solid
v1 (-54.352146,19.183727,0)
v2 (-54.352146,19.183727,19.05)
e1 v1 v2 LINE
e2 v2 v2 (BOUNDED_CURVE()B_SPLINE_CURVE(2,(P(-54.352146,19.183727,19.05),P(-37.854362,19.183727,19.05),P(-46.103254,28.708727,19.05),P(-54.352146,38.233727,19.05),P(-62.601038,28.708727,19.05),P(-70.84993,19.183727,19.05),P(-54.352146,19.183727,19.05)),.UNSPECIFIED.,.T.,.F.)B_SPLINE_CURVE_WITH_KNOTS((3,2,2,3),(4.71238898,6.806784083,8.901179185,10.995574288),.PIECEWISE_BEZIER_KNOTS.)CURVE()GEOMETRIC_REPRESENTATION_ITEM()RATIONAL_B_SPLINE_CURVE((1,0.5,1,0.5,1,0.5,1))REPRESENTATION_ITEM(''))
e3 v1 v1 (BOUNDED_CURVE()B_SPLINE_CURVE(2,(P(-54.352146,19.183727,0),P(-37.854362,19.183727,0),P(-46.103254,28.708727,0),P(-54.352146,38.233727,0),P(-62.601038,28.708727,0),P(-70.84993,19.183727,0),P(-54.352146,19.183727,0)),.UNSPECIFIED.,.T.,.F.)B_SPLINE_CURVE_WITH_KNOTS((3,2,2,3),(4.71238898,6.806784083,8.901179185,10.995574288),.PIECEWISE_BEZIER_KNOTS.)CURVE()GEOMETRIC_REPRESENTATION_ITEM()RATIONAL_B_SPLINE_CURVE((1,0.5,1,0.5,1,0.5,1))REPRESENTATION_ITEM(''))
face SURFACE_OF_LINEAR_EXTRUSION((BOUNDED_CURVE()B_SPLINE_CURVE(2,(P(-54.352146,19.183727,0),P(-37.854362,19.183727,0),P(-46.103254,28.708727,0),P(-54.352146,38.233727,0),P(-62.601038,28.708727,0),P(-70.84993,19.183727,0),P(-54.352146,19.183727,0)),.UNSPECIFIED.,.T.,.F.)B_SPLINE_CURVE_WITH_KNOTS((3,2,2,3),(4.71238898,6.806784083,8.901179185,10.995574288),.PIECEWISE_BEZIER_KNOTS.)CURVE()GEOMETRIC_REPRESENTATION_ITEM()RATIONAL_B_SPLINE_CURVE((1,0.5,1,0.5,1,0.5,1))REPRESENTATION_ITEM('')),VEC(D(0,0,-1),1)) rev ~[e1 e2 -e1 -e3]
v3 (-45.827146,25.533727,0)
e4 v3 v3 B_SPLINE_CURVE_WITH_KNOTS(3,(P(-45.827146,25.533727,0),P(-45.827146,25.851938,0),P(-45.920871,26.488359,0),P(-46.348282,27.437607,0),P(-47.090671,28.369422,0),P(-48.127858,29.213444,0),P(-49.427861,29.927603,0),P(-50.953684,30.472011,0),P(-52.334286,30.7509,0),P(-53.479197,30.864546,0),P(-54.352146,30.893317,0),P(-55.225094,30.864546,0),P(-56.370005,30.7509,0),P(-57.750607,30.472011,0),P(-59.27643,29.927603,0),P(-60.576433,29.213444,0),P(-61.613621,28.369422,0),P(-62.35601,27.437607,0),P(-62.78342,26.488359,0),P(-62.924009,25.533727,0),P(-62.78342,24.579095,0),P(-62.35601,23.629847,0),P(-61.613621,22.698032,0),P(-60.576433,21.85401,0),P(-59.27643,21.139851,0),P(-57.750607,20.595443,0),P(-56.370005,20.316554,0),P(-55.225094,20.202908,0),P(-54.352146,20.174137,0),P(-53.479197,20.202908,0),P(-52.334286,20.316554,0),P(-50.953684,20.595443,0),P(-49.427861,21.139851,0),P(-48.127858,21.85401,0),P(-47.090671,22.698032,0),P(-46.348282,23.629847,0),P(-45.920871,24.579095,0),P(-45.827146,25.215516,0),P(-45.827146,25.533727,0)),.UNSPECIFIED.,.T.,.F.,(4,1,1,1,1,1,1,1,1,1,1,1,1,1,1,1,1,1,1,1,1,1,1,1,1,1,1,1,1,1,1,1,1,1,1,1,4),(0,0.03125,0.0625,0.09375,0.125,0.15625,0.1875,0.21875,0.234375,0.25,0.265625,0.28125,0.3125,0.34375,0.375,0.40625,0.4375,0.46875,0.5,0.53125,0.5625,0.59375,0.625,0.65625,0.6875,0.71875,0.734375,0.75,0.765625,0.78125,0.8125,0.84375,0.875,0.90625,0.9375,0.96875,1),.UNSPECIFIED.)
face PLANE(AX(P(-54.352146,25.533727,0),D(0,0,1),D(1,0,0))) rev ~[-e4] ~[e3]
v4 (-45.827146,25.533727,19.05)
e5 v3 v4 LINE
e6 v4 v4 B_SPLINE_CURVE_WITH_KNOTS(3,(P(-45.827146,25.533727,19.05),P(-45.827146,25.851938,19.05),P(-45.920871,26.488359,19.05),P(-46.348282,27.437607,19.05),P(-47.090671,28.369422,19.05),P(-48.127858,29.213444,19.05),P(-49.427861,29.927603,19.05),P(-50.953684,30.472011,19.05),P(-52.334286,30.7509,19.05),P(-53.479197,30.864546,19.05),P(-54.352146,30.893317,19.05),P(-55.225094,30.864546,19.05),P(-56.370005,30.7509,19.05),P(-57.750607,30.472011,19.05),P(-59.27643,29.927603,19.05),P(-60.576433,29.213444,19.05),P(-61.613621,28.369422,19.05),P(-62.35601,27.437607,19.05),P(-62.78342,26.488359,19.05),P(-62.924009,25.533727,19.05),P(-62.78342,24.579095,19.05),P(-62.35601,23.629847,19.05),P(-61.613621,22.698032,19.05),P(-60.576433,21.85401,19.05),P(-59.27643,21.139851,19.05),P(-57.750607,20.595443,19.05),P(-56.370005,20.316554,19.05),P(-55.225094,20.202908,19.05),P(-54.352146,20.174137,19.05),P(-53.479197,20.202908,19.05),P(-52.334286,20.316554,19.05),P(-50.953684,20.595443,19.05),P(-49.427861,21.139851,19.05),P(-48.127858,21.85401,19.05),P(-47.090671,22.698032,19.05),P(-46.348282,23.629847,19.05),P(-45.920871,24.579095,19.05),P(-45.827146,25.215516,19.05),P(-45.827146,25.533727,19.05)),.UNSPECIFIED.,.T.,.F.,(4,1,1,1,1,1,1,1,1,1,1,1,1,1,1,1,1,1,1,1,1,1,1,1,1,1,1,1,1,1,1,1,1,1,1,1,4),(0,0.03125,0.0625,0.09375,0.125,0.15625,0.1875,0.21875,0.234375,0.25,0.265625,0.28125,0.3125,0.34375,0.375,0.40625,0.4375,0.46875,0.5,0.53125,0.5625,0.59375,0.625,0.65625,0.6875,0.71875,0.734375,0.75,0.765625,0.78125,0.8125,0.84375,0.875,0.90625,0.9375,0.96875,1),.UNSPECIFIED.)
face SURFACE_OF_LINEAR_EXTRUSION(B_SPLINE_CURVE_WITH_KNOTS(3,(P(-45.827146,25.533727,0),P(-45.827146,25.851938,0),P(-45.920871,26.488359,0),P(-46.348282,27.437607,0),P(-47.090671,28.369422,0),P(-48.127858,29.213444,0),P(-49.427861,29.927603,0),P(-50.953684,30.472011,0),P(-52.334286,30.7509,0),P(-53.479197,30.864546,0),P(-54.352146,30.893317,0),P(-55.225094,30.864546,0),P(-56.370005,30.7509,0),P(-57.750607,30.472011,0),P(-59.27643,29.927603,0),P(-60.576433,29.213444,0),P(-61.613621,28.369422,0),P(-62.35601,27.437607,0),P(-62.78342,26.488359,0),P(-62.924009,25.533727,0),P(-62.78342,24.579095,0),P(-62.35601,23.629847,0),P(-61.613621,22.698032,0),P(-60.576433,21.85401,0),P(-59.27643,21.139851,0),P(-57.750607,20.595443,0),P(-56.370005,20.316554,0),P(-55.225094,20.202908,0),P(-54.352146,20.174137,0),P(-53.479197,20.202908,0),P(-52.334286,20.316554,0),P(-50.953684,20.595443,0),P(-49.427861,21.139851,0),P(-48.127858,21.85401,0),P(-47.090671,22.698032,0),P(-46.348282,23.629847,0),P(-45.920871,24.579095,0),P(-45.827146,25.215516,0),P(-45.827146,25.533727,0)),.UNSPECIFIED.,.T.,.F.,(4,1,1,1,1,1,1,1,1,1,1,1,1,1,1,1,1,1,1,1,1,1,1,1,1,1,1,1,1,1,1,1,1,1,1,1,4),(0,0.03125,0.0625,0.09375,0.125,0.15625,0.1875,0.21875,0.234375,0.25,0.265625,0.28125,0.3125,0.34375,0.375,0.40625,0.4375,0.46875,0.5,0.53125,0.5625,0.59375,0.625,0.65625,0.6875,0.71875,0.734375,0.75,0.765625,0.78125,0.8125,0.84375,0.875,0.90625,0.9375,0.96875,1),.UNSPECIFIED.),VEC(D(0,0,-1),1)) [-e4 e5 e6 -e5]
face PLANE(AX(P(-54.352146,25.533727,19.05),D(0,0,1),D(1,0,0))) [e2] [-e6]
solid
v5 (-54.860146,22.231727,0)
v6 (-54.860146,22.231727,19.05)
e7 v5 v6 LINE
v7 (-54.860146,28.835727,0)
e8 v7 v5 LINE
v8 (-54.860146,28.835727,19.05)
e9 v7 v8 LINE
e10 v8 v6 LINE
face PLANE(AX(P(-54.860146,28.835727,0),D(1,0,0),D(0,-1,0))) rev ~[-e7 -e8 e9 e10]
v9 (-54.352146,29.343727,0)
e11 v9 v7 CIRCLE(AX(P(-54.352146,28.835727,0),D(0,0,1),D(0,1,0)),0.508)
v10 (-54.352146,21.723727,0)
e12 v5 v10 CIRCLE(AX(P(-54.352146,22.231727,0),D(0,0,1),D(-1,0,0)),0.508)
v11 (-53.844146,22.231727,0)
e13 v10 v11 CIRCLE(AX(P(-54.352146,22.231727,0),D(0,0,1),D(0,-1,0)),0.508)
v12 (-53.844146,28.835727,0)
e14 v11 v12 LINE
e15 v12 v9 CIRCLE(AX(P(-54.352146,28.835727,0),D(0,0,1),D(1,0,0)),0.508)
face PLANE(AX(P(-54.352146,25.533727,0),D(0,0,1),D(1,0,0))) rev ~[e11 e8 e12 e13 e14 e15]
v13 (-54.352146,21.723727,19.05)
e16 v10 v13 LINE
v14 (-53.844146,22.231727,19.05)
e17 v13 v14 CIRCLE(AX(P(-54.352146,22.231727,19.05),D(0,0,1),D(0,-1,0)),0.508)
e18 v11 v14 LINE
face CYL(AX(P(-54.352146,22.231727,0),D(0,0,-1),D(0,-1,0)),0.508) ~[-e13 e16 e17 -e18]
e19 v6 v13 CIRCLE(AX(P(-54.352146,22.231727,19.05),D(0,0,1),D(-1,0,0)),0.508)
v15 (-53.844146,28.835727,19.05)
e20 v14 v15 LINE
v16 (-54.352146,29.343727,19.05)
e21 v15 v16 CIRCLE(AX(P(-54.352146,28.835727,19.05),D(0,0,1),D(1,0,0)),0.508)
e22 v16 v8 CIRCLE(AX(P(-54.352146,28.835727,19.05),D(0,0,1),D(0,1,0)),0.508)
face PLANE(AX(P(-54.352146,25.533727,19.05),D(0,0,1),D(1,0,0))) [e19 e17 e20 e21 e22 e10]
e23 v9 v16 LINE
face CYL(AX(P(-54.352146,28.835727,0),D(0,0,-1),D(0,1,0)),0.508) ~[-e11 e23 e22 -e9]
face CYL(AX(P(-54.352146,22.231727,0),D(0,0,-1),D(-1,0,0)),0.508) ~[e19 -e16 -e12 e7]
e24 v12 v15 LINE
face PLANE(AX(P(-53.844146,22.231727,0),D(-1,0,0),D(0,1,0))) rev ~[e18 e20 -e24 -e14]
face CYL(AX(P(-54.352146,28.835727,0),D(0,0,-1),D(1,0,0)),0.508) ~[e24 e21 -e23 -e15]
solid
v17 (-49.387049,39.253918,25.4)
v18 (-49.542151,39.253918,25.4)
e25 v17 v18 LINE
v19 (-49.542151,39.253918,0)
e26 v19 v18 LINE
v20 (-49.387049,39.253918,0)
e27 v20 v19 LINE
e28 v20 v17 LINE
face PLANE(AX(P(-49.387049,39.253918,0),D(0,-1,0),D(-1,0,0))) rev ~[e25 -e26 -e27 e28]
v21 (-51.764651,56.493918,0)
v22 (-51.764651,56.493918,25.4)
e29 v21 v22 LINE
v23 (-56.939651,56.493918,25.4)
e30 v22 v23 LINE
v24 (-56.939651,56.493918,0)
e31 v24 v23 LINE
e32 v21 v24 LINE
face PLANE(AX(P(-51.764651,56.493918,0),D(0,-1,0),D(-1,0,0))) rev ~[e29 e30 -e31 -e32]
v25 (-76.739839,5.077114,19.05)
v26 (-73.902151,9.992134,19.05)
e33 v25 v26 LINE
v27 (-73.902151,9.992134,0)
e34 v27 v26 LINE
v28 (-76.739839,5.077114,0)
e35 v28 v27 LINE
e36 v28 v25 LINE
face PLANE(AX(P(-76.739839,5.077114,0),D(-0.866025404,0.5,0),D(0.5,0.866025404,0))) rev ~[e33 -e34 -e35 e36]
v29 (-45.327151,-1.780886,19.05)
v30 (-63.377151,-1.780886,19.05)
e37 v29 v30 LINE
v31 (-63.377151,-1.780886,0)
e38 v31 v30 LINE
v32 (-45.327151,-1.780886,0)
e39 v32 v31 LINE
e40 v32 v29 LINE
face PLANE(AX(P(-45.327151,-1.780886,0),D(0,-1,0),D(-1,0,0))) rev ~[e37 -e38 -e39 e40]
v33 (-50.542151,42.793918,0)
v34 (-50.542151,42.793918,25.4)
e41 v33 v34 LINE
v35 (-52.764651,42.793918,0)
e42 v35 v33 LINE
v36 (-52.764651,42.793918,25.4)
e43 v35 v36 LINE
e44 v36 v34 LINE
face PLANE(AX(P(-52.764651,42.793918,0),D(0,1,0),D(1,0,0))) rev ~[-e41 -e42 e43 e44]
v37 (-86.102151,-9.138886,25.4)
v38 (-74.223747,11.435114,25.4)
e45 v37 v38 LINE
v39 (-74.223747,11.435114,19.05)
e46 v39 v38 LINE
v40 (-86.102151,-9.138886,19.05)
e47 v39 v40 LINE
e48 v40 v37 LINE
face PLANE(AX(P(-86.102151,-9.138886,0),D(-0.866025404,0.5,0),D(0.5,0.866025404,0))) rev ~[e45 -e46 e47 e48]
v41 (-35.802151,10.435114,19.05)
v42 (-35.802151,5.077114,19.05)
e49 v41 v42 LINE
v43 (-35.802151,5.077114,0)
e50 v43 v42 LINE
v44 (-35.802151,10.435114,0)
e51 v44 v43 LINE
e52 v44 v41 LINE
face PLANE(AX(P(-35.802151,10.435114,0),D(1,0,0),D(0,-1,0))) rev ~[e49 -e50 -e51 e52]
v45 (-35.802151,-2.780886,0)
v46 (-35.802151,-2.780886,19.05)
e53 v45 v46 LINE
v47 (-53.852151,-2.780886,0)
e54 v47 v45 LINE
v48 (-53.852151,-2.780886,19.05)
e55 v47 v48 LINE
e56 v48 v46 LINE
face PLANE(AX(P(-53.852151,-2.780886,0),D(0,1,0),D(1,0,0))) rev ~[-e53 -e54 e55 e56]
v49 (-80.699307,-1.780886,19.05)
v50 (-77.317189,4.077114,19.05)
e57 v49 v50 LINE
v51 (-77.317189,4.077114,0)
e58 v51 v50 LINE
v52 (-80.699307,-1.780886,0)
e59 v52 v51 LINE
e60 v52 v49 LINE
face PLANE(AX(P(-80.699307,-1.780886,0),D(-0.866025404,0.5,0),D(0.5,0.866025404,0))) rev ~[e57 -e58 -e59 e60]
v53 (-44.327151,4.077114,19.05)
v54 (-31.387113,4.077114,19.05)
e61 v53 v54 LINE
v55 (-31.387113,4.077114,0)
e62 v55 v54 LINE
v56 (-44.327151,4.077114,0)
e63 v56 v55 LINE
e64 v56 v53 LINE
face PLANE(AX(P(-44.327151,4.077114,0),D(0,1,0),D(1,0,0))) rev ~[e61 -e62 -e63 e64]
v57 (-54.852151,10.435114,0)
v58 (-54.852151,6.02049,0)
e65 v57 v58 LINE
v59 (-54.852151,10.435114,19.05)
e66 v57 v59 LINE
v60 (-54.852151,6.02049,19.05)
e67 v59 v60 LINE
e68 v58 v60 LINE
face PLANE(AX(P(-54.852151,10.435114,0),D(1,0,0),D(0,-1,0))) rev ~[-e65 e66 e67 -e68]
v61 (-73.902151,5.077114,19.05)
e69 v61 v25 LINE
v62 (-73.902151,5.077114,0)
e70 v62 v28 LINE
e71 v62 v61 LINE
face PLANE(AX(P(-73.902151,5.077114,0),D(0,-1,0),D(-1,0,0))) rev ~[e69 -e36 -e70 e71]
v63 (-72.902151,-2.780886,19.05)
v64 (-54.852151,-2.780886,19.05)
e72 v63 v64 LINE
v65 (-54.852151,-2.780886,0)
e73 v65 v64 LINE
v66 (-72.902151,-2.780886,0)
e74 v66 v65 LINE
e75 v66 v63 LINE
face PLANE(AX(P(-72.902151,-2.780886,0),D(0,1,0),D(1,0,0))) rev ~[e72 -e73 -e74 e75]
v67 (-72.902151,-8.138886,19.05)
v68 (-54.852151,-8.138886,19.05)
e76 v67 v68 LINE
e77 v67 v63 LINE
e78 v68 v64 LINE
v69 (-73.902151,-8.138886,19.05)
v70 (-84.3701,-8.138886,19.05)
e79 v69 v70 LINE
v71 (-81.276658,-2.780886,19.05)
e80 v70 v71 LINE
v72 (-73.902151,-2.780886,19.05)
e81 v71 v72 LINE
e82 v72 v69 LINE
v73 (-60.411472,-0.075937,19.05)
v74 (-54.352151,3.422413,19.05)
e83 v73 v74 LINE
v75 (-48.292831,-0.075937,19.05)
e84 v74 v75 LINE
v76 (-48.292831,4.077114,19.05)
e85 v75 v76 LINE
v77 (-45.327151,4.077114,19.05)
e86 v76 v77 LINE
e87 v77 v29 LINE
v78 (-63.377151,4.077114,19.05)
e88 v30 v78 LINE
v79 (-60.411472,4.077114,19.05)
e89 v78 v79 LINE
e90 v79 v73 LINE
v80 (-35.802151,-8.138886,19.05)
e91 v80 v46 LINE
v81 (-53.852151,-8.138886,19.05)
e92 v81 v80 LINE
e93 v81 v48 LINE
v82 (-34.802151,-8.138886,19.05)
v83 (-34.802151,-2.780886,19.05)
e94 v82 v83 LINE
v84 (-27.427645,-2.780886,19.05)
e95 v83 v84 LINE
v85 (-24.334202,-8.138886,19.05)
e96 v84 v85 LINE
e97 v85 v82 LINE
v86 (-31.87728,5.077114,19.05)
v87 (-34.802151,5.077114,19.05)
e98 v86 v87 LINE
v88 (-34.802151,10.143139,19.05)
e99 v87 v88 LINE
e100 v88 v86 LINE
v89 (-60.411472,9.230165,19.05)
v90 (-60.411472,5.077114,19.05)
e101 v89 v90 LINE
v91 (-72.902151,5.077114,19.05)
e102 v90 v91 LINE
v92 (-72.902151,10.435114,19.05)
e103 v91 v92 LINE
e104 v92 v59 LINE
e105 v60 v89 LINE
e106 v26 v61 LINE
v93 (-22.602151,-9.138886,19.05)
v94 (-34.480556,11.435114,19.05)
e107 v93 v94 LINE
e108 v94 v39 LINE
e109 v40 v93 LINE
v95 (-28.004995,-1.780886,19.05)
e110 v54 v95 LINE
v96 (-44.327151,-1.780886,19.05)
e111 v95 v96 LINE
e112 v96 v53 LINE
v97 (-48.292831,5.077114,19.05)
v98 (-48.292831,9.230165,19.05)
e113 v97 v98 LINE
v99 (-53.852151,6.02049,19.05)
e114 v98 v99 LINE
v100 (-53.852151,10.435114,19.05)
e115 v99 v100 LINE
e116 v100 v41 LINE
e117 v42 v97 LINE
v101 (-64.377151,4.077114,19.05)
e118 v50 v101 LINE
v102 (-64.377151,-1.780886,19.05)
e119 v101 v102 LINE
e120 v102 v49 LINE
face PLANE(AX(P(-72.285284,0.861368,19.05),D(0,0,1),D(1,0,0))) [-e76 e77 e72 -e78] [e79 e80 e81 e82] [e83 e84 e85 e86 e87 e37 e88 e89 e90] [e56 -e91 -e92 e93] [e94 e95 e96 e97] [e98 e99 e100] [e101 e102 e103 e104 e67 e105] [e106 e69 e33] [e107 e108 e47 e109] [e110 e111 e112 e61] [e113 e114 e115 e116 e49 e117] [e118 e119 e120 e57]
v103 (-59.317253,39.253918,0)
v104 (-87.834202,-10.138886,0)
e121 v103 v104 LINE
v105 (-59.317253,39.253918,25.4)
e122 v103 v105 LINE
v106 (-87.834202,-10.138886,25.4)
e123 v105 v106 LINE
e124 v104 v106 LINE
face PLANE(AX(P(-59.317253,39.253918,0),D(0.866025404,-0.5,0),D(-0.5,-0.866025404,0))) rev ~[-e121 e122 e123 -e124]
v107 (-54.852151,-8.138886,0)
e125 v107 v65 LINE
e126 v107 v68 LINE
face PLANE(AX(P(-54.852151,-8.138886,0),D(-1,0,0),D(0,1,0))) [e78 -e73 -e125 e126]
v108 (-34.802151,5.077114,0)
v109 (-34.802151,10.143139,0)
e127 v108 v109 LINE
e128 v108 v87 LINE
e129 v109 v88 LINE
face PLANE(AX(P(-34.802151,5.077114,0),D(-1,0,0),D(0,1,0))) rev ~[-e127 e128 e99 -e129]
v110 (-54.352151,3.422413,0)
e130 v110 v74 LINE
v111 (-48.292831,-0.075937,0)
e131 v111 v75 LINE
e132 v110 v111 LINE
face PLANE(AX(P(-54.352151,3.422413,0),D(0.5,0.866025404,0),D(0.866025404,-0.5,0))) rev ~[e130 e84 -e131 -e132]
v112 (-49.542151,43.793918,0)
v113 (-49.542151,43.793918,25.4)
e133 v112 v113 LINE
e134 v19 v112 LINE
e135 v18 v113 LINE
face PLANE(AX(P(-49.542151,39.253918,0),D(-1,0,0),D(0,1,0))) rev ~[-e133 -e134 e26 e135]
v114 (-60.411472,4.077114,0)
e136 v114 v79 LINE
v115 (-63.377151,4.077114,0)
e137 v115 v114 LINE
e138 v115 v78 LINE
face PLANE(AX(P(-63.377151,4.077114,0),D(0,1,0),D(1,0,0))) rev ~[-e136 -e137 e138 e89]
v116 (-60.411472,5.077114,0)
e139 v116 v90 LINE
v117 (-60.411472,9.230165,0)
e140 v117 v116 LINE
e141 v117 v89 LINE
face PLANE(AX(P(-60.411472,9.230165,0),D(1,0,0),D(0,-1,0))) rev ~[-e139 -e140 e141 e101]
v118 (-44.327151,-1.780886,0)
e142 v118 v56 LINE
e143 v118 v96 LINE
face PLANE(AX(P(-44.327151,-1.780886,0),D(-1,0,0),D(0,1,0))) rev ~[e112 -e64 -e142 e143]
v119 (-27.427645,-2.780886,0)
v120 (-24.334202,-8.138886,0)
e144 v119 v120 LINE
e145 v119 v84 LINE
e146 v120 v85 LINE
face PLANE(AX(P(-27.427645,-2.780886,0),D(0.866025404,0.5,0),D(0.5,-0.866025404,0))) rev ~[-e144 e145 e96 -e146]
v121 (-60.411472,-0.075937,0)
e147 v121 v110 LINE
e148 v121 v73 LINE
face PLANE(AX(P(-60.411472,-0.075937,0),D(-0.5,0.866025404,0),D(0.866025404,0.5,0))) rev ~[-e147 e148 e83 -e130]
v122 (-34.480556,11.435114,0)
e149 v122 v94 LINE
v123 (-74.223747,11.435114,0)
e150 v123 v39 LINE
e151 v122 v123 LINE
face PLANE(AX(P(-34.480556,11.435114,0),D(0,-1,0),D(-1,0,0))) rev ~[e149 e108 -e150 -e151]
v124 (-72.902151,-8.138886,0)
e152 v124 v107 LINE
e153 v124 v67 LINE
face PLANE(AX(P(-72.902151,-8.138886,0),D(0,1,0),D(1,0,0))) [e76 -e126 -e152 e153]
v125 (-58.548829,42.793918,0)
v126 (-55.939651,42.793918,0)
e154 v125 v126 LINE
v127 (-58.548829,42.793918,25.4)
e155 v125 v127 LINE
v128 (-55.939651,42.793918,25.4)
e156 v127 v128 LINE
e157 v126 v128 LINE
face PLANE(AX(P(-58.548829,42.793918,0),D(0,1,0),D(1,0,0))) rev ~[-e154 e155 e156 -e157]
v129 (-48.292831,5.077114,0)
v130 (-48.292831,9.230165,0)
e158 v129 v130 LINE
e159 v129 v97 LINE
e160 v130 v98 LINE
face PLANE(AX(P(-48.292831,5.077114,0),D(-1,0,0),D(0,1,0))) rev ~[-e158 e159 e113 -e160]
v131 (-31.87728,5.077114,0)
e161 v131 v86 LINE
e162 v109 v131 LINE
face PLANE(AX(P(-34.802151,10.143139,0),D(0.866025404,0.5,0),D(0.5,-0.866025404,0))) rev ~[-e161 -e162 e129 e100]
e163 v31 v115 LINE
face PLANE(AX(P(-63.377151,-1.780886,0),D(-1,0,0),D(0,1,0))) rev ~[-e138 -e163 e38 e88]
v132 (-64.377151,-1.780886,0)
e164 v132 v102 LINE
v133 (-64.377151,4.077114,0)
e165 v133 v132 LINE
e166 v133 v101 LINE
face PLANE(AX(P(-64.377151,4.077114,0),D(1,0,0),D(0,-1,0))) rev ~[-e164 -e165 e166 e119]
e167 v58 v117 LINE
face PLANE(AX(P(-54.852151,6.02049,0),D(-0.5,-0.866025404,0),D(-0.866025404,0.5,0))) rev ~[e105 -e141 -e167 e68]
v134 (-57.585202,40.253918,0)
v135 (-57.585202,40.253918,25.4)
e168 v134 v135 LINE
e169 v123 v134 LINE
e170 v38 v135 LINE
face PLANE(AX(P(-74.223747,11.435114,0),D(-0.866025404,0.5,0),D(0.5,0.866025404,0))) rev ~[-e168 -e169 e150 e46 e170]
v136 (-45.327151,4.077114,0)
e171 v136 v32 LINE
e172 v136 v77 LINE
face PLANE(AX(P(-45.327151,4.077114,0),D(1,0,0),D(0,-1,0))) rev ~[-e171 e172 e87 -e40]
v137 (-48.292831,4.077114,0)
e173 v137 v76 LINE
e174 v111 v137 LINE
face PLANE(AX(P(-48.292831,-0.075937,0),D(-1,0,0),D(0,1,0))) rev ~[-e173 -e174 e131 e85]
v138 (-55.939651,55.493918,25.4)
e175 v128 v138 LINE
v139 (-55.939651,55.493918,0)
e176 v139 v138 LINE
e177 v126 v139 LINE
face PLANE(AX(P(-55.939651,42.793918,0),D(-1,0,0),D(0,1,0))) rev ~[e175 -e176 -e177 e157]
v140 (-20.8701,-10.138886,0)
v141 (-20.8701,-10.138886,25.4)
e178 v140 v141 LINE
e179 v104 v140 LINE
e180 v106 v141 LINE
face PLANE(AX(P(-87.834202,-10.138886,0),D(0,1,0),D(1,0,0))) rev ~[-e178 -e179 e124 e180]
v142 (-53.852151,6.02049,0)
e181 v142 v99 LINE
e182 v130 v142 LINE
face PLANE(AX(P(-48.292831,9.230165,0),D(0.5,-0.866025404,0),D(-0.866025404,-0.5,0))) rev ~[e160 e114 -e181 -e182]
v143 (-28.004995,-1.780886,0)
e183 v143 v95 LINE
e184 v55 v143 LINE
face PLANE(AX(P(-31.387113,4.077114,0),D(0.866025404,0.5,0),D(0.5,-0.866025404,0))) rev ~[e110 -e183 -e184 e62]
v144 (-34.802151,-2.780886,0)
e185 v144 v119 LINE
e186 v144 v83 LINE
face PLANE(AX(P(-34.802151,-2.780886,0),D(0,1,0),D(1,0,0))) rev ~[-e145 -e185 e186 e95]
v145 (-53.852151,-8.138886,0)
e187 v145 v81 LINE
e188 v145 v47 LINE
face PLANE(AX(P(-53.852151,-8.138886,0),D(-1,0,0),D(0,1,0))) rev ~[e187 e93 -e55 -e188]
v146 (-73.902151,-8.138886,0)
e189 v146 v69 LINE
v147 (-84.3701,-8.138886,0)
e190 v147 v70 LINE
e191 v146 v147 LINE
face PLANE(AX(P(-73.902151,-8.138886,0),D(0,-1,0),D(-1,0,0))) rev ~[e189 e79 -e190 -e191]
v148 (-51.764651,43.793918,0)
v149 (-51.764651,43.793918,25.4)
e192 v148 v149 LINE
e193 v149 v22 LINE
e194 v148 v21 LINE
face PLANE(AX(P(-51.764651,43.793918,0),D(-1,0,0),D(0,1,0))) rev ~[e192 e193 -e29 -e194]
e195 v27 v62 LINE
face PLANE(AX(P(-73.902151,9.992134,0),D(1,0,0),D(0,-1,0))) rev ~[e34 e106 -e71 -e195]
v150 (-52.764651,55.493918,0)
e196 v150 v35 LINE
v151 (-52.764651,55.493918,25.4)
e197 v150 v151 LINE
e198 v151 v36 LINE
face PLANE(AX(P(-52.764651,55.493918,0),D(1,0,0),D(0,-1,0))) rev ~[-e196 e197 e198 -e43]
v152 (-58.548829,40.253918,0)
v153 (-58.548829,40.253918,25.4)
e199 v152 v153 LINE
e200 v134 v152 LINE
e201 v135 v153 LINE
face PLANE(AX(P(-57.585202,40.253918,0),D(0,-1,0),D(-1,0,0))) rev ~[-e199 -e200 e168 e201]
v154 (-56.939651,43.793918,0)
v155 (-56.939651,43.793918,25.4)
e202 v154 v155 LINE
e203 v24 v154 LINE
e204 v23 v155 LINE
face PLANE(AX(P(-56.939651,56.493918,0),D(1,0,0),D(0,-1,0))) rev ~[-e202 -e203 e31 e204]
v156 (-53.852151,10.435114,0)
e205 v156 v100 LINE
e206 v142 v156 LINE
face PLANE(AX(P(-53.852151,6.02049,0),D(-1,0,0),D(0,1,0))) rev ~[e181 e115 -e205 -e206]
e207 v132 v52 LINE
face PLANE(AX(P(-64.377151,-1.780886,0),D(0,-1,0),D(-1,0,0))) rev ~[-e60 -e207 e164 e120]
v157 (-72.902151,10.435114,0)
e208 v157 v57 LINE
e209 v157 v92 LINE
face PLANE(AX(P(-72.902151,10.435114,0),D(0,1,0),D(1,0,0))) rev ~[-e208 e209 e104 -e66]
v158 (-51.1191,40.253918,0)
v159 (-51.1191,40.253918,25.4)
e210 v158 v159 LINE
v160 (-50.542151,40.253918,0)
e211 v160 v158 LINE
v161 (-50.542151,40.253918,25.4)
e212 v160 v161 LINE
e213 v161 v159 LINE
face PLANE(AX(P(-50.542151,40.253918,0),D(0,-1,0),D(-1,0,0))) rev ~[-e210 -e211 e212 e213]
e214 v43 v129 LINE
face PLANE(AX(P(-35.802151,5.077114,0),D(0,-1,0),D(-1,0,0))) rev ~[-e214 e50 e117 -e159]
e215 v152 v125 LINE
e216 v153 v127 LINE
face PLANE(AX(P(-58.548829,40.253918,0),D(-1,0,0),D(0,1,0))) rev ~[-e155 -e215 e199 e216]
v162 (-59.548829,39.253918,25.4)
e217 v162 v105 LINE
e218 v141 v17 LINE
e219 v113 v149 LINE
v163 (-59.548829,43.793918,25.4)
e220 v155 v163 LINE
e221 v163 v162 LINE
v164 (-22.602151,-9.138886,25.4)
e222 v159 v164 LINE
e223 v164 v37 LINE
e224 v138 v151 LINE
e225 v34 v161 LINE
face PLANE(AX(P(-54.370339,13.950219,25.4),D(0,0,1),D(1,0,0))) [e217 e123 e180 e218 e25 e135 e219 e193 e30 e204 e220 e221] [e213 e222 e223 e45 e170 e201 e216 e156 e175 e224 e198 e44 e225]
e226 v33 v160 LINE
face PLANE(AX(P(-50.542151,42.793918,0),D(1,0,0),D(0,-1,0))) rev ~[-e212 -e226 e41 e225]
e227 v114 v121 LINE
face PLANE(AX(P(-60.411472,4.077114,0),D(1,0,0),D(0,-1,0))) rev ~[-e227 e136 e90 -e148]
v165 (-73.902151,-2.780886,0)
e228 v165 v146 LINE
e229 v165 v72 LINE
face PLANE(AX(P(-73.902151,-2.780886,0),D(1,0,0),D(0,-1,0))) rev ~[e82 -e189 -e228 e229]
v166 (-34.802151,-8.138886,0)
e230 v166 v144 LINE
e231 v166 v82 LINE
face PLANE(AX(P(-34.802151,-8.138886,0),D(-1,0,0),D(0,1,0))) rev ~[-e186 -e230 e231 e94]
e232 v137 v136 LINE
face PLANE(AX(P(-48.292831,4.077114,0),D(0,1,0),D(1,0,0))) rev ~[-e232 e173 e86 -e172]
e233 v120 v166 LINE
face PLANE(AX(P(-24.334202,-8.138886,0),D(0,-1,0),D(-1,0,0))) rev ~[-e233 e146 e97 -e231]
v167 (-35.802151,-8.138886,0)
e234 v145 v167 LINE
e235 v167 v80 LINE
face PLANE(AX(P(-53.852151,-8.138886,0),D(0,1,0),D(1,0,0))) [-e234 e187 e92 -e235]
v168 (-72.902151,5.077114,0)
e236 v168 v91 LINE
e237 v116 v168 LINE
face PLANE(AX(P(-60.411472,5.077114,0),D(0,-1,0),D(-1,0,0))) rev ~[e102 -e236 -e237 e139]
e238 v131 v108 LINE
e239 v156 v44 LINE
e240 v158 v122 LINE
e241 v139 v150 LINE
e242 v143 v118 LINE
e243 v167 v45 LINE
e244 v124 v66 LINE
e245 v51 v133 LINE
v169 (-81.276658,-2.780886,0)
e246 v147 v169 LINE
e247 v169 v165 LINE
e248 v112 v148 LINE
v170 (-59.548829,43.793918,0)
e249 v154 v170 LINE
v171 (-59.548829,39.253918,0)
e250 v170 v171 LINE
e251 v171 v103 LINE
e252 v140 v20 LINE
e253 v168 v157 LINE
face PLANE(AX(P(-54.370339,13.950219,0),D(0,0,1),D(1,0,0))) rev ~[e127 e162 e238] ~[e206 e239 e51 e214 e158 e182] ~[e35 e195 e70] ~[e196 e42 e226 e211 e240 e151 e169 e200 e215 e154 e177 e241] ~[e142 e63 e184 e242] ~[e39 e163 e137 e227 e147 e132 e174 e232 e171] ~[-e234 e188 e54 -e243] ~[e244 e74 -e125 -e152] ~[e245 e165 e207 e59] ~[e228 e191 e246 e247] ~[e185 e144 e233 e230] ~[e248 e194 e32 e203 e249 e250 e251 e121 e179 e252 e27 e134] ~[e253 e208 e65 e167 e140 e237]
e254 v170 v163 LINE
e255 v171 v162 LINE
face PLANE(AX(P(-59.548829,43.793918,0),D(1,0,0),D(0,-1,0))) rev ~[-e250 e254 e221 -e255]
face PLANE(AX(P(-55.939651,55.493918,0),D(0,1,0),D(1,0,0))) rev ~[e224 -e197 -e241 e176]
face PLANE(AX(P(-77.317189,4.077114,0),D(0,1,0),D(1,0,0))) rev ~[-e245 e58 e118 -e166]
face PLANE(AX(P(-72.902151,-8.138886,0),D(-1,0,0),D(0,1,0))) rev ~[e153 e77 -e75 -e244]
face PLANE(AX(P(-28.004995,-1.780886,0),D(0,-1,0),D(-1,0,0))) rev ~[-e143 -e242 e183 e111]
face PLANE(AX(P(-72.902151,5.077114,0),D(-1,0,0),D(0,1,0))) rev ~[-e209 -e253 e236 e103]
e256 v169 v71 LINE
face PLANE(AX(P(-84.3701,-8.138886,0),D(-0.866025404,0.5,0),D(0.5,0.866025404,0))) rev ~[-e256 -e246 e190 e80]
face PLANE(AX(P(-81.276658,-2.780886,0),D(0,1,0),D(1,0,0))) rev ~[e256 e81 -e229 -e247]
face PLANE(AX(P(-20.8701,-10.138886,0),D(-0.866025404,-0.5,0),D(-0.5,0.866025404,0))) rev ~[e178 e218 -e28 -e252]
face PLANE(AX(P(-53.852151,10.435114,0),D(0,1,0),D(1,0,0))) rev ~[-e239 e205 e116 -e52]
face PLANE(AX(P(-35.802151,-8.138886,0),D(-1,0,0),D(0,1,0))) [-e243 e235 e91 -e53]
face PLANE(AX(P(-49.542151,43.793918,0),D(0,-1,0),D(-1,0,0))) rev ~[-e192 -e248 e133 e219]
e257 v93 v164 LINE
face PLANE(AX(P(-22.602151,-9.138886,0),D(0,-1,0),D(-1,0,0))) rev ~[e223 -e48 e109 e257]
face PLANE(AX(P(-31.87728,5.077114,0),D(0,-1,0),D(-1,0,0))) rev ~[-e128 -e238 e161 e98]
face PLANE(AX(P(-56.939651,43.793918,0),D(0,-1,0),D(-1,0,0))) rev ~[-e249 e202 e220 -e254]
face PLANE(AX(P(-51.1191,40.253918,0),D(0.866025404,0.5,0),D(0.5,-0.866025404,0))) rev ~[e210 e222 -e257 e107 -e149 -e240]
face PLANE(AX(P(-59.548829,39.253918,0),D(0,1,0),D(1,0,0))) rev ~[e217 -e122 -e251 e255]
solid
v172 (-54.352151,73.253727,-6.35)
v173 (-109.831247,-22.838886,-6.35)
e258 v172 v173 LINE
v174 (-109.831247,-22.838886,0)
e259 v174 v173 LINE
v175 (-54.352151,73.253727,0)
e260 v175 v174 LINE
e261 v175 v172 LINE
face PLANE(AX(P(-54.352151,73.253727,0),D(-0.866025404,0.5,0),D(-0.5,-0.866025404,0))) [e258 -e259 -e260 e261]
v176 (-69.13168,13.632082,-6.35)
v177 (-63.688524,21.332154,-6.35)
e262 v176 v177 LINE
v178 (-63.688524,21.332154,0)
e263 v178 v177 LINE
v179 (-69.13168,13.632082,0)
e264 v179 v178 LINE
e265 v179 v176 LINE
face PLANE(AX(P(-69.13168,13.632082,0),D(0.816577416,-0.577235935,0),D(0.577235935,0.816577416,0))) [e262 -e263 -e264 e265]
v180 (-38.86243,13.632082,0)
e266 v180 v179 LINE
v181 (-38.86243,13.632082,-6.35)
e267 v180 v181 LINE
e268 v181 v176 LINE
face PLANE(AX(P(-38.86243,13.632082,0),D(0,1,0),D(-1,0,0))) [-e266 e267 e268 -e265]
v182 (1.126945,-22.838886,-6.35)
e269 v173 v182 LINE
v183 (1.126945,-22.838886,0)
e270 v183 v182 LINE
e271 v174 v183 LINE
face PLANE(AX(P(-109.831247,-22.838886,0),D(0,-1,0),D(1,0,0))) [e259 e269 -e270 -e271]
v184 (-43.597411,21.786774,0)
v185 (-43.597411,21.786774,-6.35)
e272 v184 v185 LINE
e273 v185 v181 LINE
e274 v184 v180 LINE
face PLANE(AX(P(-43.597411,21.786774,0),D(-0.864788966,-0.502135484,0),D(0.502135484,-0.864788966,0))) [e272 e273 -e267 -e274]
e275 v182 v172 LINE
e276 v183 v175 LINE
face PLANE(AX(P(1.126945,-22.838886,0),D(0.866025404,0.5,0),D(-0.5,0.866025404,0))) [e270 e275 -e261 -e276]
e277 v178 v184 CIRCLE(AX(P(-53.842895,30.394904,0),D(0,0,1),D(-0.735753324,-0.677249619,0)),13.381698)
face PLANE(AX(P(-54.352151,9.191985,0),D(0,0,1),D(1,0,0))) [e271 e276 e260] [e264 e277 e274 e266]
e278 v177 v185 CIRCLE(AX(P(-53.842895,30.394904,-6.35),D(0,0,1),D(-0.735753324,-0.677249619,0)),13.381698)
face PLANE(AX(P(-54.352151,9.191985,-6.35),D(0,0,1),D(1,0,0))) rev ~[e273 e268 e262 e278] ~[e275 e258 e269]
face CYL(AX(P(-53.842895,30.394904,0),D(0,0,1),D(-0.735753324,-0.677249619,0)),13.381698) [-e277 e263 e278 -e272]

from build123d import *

# Parameters (mm, degrees)
F0_W     = 18.05
F0_H     = 5.358
F1_DEPTH = 19.05
F2_DEPTH = 25.4
F4_DEPTH = 6.35


# Not quite as in the source:
# - the dataset's text gives a spline's control points without its knots; the knots are read off the source's solid


with BuildPart() as f1:
    # F0 (on Top) → F1 (new body)
    with BuildSketch(Plane.XY):
        Polygon((-73.402151112, 4.5771139196), (-78.1832148198, 4.5771139196), (-82.1426829659, -2.2808860804), (-73.402151112, -2.2808860804), (-63.877151112, -2.2808860804), (-63.877151112, 4.5771139196), align=None)
        Polygon((-64.377151112, -1.7808860804), (-80.6993072929, -1.7808860804), (-77.317189416, 4.0771139196), (-64.377151112, 4.0771139196), align=None, mode=Mode.SUBTRACT)
        Polygon((-73.402151112, -2.2808860804), (-82.1426829659, -2.2808860804), (-86.102151112, -9.1388860804), (-73.402151112, -9.1388860804), align=None)
        Polygon((-84.3701003044, -8.1388860804), (-81.2766575621, -2.7808860804), (-73.902151112, -2.7808860804), (-73.902151112, -8.1388860804), align=None, mode=Mode.SUBTRACT)
        Polygon((-63.877151112, -2.2808860804), (-73.402151112, -2.2808860804), (-73.402151112, -9.1388860804), (-54.352151112, -9.1388860804), (-54.352151112, -2.2808860804), align=None)
        with Locations((-63.877151112, -5.4598860804)):
            Rectangle(F0_W, F0_H, mode=Mode.SUBTRACT)
        Polygon((-35.302151112, 11.4351139196), (-73.402151112, 11.4351139196), (-73.402151112, 4.5771139196), (-63.877151112, 4.5771139196), (-63.877151112, -2.2808860804), (-54.352151112, -2.2808860804), (-44.827151112, -2.2808860804), (-44.827151112, 4.5771139196), (-35.302151112, 4.5771139196), align=None)
        Polygon((-48.2928307031, -0.0759368879), (-48.2928307031, 4.0771139196), (-45.327151112, 4.0771139196), (-45.327151112, -1.7808860804), (-63.377151112, -1.7808860804), (-63.377151112, 4.0771139196), (-60.4114715209, 4.0771139196), (-60.4114715209, -0.0759368879), (-54.352151112, 3.4224133812), align=None, mode=Mode.SUBTRACT)
        Polygon((-60.4114715209, 9.2301647272), (-60.4114715209, 5.0771139196), (-72.902151112, 5.0771139196), (-72.902151112, 10.4351139196), (-54.852151112, 10.4351139196), (-54.852151112, 6.0204895926), align=None, mode=Mode.SUBTRACT)
        Polygon((-35.802151112, 5.0771139196), (-48.2928307031, 5.0771139196), (-48.2928307031, 9.2301647272), (-53.852151112, 6.0204895926), (-53.852151112, 10.4351139196), (-35.802151112, 10.4351139196), align=None, mode=Mode.SUBTRACT)
        Polygon((-73.402151112, 11.4351139196), (-74.2237466737, 11.4351139196), (-78.1832148198, 4.5771139196), (-73.402151112, 4.5771139196), align=None)
        Polygon((-73.902151112, 5.0771139196), (-76.7398391468, 5.0771139196), (-73.902151112, 9.992133772), align=None, mode=Mode.SUBTRACT)
        Polygon((-34.4805555503, 11.4351139196), (-35.302151112, 11.4351139196), (-35.302151112, 4.5771139196), (-30.5210874042, 4.5771139196), align=None)
        Polygon((-34.802151112, 10.1431388709), (-31.8772802426, 5.0771139196), (-34.802151112, 5.0771139196), align=None, mode=Mode.SUBTRACT)
        Polygon((-30.5210874042, 4.5771139196), (-35.302151112, 4.5771139196), (-44.827151112, 4.5771139196), (-44.827151112, -2.2808860804), (-35.302151112, -2.2808860804), (-26.5616192581, -2.2808860804), align=None)
        Polygon((-31.387112808, 4.0771139196), (-28.0049949311, -1.7808860804), (-44.327151112, -1.7808860804), (-44.327151112, 4.0771139196), align=None, mode=Mode.SUBTRACT)
        Polygon((-22.602151112, -9.1388860804), (-26.5616192581, -2.2808860804), (-35.302151112, -2.2808860804), (-35.302151112, -9.1388860804), align=None)
        Polygon((-34.802151112, -2.7808860804), (-27.4276446619, -2.7808860804), (-24.3342019195, -8.1388860804), (-34.802151112, -8.1388860804), align=None, mode=Mode.SUBTRACT)
        Polygon((-54.352151112, -2.2808860804), (-54.352151112, -9.1388860804), (-35.302151112, -9.1388860804), (-35.302151112, -2.2808860804), (-44.827151112, -2.2808860804), align=None)
        with Locations((-44.827151112, -5.4598860804)):
            Rectangle(F0_W, F0_H, mode=Mode.SUBTRACT)
    extrude(amount=F1_DEPTH)

    # F0 (on Top) → F2 (join)
    with BuildSketch(Plane.XY):
        Polygon((-56.939651112, 43.7939179328), (-59.5488287793, 43.7939179328), (-59.5488287793, 39.2539179328), (-59.3172532265, 39.2539179328), (-87.8342019195, -10.1388860804), (-20.8701003044, -10.1388860804), (-49.3870489975, 39.2539179328), (-49.542151112, 39.2539179328), (-49.542151112, 43.7939179328), (-51.764651112, 43.7939179328), (-51.764651112, 56.4939179328), (-56.939651112, 56.4939179328), align=None)
        Polygon((-74.2237466737, 11.4351139196), (-57.5852024189, 40.2539179328), (-58.5488287793, 40.2539179328), (-58.5488287793, 42.7939179328), (-55.939651112, 42.7939179328), (-55.939651112, 55.4939179328), (-52.764651112, 55.4939179328), (-52.764651112, 42.7939179328), (-50.542151112, 42.7939179328), (-50.542151112, 40.2539179328), (-51.119099805, 40.2539179328), (-34.4805555503, 11.4351139196), (-30.5210874042, 4.5771139196), (-26.5616192581, -2.2808860804), (-22.602151112, -9.1388860804), (-35.302151112, -9.1388860804), (-54.352151112, -9.1388860804), (-73.402151112, -9.1388860804), (-86.102151112, -9.1388860804), (-82.1426829659, -2.2808860804), (-78.1832148198, 4.5771139196), align=None, mode=Mode.SUBTRACT)
    extrude(amount=F2_DEPTH)


with BuildPart() as f1b:
    # F0 (on Top) → F1, piece 2 (new body)
    with BuildSketch(Plane.XY):
        with BuildLine():
            add(Edge.make_bspline(
                [(-54.352145642, 19.1837270599), (-37.8543616999, 19.1837270599), (-46.103253671, 28.7087270599), (-54.352145642, 38.2337270599), (-62.6010376131, 28.7087270599), (-70.8499295841, 19.1837270599), (-54.352145642, 19.1837270599)],
                knots=[4.7123889804, 4.7123889804, 4.7123889804, 6.8067840828, 6.8067840828, 8.9011791852, 8.9011791852, 10.9955742876, 10.9955742876, 10.9955742876], degree=2, weights=[1, 0.5, 1, 0.5, 1, 0.5, 1]))
        make_face()
        with BuildLine():
            add(Edge.make_bspline(
                [(-45.827145642, 25.5337270599), (-45.827145642, 25.8519377152), (-45.9208714076, 26.4883590256), (-46.3482817791, 27.4376066909), (-47.0906705746, 28.3694216685), (-48.1278583866, 29.2134440557), (-49.4278608435, 29.9276027455), (-50.9536840842, 30.4720106822), (-52.334286038, 30.7509003907), (-53.4791973585, 30.8645462988), (-54.352145642, 30.8933174405), (-55.2250939256, 30.8645462988), (-56.3700052461, 30.7509003907), (-57.7506071999, 30.4720106822), (-59.2764304406, 29.9276027455), (-60.5764328975, 29.2134440557), (-61.6136207095, 28.3694216685), (-62.3560095049, 27.4376066909), (-62.7834198764, 26.4883590256), (-62.9240085248, 25.5337270599), (-62.7834198764, 24.5790950943), (-62.3560095049, 23.6298474289), (-61.6136207095, 22.6980324514), (-60.5764328975, 21.8540100641), (-59.2764304406, 21.1398513743), (-57.7506071999, 20.5954434377), (-56.3700052461, 20.3165537291), (-55.2250939256, 20.2029078211), (-54.352145642, 20.1741366794), (-53.4791973585, 20.2029078211), (-52.334286038, 20.3165537291), (-50.9536840842, 20.5954434377), (-49.4278608435, 21.1398513743), (-48.1278583866, 21.8540100641), (-47.0906705746, 22.6980324514), (-46.3482817791, 23.6298474289), (-45.9208714076, 24.5790950943), (-45.827145642, 25.2155164047), (-45.827145642, 25.5337270599)],
                knots=[0, 0, 0, 0, 0.03125, 0.0625, 0.09375, 0.125, 0.15625, 0.1875, 0.21875, 0.234375, 0.25, 0.265625, 0.28125, 0.3125, 0.34375, 0.375, 0.40625, 0.4375, 0.46875, 0.5, 0.53125, 0.5625, 0.59375, 0.625, 0.65625, 0.6875, 0.71875, 0.734375, 0.75, 0.765625, 0.78125, 0.8125, 0.84375, 0.875, 0.90625, 0.9375, 0.96875, 1, 1, 1, 1], degree=3))
        make_face(mode=Mode.SUBTRACT)
    extrude(amount=F1_DEPTH)


with BuildPart() as f1c:
    # F0 (on Top) → F1, piece 3 (new body)
    with BuildSketch(Plane.XY):
        with BuildLine():
            ThreePointArc((-54.352145642, 29.3437270599), (-54.7113558869, 29.1949373048), (-54.860145642, 28.8357270599))
            Line((-54.860145642, 28.8357270599), (-54.860145642, 22.2317270599))
            ThreePointArc((-54.860145642, 22.2317270599), (-54.7113558869, 21.8725168151), (-54.352145642, 21.7237270599))
            ThreePointArc((-54.352145642, 21.7237270599), (-53.9929353972, 21.8725168151), (-53.844145642, 22.2317270599))
            Line((-53.844145642, 22.2317270599), (-53.844145642, 28.8357270599))
            ThreePointArc((-53.844145642, 28.8357270599), (-53.9929353972, 29.1949373048), (-54.352145642, 29.3437270599))
        make_face()
    extrude(amount=F1_DEPTH)


with BuildPart() as f4:
    # F3 (on face) → F4 (new body)
    with BuildSketch(Plane.XY):
        Polygon((-109.8312471757, -22.8388860804), (1.1269449517, -22.8388860804), (-54.352151112, 73.2537270599), align=None)
        Polygon((-59.5488287793, 43.7939179328), (-56.939651112, 43.7939179328), (-56.939651112, 56.4939179328), (-51.764651112, 56.4939179328), (-51.764651112, 43.7939179328), (-49.542151112, 43.7939179328), (-49.542151112, 39.2539179328), (-49.3870489975, 39.2539179328), (-20.8701003044, -10.1388860804), (-87.8342019195, -10.1388860804), (-59.3172532265, 39.2539179328), (-59.5488287793, 39.2539179328), align=None, mode=Mode.SUBTRACT)
        Polygon((-56.939651112, 56.4939179328), (-56.939651112, 43.7939179328), (-59.5488287793, 43.7939179328), (-59.5488287793, 39.2539179328), (-59.3172532265, 39.2539179328), (-87.8342019195, -10.1388860804), (-20.8701003044, -10.1388860804), (-49.3870489975, 39.2539179328), (-49.542151112, 39.2539179328), (-49.542151112, 43.7939179328), (-51.764651112, 43.7939179328), (-51.764651112, 56.4939179328), align=None)
        Polygon((-78.1832148198, 4.5771139196), (-74.2237466737, 11.4351139196), (-57.5852024189, 40.2539179328), (-58.5488287793, 40.2539179328), (-58.5488287793, 42.7939179328), (-55.939651112, 42.7939179328), (-55.939651112, 55.4939179328), (-52.764651112, 55.4939179328), (-52.764651112, 42.7939179328), (-50.542151112, 42.7939179328), (-50.542151112, 40.2539179328), (-51.119099805, 40.2539179328), (-34.4805555503, 11.4351139196), (-30.5210874042, 4.5771139196), (-26.5616192581, -2.2808860804), (-22.602151112, -9.1388860804), (-35.302151112, -9.1388860804), (-54.352151112, -9.1388860804), (-73.402151112, -9.1388860804), (-86.102151112, -9.1388860804), (-82.1426829659, -2.2808860804), align=None, mode=Mode.SUBTRACT)
        Polygon((-57.5852024189, 40.2539179328), (-74.2237466737, 11.4351139196), (-78.1832148198, 4.5771139196), (-82.1426829659, -2.2808860804), (-86.102151112, -9.1388860804), (-73.402151112, -9.1388860804), (-54.352151112, -9.1388860804), (-35.302151112, -9.1388860804), (-22.602151112, -9.1388860804), (-26.5616192581, -2.2808860804), (-30.5210874042, 4.5771139196), (-34.4805555503, 11.4351139196), (-51.119099805, 40.2539179328), (-50.542151112, 40.2539179328), (-50.542151112, 42.7939179328), (-52.764651112, 42.7939179328), (-52.764651112, 55.4939179328), (-55.939651112, 55.4939179328), (-55.939651112, 42.7939179328), (-58.5488287793, 42.7939179328), (-58.5488287793, 40.2539179328), align=None)
        with BuildLine():
            ThreePointArc((-63.6885240674, 21.3321540505), (-53.5401728786, 17.0166304748), (-43.5974113792, 21.7867740102))
            Line((-43.5974113792, 21.7867740102), (-38.8624295592, 13.6320823804))
            Line((-38.8624295592, 13.6320823804), (-69.1316798329, 13.6320823804))
            Line((-69.1316798329, 13.6320823804), (-63.6885240674, 21.3321540505))
        make_face(mode=Mode.SUBTRACT)
    extrude(amount=-F4_DEPTH)


solid = Compound([f1.part, f1b.part, f1c.part, f4.part])
